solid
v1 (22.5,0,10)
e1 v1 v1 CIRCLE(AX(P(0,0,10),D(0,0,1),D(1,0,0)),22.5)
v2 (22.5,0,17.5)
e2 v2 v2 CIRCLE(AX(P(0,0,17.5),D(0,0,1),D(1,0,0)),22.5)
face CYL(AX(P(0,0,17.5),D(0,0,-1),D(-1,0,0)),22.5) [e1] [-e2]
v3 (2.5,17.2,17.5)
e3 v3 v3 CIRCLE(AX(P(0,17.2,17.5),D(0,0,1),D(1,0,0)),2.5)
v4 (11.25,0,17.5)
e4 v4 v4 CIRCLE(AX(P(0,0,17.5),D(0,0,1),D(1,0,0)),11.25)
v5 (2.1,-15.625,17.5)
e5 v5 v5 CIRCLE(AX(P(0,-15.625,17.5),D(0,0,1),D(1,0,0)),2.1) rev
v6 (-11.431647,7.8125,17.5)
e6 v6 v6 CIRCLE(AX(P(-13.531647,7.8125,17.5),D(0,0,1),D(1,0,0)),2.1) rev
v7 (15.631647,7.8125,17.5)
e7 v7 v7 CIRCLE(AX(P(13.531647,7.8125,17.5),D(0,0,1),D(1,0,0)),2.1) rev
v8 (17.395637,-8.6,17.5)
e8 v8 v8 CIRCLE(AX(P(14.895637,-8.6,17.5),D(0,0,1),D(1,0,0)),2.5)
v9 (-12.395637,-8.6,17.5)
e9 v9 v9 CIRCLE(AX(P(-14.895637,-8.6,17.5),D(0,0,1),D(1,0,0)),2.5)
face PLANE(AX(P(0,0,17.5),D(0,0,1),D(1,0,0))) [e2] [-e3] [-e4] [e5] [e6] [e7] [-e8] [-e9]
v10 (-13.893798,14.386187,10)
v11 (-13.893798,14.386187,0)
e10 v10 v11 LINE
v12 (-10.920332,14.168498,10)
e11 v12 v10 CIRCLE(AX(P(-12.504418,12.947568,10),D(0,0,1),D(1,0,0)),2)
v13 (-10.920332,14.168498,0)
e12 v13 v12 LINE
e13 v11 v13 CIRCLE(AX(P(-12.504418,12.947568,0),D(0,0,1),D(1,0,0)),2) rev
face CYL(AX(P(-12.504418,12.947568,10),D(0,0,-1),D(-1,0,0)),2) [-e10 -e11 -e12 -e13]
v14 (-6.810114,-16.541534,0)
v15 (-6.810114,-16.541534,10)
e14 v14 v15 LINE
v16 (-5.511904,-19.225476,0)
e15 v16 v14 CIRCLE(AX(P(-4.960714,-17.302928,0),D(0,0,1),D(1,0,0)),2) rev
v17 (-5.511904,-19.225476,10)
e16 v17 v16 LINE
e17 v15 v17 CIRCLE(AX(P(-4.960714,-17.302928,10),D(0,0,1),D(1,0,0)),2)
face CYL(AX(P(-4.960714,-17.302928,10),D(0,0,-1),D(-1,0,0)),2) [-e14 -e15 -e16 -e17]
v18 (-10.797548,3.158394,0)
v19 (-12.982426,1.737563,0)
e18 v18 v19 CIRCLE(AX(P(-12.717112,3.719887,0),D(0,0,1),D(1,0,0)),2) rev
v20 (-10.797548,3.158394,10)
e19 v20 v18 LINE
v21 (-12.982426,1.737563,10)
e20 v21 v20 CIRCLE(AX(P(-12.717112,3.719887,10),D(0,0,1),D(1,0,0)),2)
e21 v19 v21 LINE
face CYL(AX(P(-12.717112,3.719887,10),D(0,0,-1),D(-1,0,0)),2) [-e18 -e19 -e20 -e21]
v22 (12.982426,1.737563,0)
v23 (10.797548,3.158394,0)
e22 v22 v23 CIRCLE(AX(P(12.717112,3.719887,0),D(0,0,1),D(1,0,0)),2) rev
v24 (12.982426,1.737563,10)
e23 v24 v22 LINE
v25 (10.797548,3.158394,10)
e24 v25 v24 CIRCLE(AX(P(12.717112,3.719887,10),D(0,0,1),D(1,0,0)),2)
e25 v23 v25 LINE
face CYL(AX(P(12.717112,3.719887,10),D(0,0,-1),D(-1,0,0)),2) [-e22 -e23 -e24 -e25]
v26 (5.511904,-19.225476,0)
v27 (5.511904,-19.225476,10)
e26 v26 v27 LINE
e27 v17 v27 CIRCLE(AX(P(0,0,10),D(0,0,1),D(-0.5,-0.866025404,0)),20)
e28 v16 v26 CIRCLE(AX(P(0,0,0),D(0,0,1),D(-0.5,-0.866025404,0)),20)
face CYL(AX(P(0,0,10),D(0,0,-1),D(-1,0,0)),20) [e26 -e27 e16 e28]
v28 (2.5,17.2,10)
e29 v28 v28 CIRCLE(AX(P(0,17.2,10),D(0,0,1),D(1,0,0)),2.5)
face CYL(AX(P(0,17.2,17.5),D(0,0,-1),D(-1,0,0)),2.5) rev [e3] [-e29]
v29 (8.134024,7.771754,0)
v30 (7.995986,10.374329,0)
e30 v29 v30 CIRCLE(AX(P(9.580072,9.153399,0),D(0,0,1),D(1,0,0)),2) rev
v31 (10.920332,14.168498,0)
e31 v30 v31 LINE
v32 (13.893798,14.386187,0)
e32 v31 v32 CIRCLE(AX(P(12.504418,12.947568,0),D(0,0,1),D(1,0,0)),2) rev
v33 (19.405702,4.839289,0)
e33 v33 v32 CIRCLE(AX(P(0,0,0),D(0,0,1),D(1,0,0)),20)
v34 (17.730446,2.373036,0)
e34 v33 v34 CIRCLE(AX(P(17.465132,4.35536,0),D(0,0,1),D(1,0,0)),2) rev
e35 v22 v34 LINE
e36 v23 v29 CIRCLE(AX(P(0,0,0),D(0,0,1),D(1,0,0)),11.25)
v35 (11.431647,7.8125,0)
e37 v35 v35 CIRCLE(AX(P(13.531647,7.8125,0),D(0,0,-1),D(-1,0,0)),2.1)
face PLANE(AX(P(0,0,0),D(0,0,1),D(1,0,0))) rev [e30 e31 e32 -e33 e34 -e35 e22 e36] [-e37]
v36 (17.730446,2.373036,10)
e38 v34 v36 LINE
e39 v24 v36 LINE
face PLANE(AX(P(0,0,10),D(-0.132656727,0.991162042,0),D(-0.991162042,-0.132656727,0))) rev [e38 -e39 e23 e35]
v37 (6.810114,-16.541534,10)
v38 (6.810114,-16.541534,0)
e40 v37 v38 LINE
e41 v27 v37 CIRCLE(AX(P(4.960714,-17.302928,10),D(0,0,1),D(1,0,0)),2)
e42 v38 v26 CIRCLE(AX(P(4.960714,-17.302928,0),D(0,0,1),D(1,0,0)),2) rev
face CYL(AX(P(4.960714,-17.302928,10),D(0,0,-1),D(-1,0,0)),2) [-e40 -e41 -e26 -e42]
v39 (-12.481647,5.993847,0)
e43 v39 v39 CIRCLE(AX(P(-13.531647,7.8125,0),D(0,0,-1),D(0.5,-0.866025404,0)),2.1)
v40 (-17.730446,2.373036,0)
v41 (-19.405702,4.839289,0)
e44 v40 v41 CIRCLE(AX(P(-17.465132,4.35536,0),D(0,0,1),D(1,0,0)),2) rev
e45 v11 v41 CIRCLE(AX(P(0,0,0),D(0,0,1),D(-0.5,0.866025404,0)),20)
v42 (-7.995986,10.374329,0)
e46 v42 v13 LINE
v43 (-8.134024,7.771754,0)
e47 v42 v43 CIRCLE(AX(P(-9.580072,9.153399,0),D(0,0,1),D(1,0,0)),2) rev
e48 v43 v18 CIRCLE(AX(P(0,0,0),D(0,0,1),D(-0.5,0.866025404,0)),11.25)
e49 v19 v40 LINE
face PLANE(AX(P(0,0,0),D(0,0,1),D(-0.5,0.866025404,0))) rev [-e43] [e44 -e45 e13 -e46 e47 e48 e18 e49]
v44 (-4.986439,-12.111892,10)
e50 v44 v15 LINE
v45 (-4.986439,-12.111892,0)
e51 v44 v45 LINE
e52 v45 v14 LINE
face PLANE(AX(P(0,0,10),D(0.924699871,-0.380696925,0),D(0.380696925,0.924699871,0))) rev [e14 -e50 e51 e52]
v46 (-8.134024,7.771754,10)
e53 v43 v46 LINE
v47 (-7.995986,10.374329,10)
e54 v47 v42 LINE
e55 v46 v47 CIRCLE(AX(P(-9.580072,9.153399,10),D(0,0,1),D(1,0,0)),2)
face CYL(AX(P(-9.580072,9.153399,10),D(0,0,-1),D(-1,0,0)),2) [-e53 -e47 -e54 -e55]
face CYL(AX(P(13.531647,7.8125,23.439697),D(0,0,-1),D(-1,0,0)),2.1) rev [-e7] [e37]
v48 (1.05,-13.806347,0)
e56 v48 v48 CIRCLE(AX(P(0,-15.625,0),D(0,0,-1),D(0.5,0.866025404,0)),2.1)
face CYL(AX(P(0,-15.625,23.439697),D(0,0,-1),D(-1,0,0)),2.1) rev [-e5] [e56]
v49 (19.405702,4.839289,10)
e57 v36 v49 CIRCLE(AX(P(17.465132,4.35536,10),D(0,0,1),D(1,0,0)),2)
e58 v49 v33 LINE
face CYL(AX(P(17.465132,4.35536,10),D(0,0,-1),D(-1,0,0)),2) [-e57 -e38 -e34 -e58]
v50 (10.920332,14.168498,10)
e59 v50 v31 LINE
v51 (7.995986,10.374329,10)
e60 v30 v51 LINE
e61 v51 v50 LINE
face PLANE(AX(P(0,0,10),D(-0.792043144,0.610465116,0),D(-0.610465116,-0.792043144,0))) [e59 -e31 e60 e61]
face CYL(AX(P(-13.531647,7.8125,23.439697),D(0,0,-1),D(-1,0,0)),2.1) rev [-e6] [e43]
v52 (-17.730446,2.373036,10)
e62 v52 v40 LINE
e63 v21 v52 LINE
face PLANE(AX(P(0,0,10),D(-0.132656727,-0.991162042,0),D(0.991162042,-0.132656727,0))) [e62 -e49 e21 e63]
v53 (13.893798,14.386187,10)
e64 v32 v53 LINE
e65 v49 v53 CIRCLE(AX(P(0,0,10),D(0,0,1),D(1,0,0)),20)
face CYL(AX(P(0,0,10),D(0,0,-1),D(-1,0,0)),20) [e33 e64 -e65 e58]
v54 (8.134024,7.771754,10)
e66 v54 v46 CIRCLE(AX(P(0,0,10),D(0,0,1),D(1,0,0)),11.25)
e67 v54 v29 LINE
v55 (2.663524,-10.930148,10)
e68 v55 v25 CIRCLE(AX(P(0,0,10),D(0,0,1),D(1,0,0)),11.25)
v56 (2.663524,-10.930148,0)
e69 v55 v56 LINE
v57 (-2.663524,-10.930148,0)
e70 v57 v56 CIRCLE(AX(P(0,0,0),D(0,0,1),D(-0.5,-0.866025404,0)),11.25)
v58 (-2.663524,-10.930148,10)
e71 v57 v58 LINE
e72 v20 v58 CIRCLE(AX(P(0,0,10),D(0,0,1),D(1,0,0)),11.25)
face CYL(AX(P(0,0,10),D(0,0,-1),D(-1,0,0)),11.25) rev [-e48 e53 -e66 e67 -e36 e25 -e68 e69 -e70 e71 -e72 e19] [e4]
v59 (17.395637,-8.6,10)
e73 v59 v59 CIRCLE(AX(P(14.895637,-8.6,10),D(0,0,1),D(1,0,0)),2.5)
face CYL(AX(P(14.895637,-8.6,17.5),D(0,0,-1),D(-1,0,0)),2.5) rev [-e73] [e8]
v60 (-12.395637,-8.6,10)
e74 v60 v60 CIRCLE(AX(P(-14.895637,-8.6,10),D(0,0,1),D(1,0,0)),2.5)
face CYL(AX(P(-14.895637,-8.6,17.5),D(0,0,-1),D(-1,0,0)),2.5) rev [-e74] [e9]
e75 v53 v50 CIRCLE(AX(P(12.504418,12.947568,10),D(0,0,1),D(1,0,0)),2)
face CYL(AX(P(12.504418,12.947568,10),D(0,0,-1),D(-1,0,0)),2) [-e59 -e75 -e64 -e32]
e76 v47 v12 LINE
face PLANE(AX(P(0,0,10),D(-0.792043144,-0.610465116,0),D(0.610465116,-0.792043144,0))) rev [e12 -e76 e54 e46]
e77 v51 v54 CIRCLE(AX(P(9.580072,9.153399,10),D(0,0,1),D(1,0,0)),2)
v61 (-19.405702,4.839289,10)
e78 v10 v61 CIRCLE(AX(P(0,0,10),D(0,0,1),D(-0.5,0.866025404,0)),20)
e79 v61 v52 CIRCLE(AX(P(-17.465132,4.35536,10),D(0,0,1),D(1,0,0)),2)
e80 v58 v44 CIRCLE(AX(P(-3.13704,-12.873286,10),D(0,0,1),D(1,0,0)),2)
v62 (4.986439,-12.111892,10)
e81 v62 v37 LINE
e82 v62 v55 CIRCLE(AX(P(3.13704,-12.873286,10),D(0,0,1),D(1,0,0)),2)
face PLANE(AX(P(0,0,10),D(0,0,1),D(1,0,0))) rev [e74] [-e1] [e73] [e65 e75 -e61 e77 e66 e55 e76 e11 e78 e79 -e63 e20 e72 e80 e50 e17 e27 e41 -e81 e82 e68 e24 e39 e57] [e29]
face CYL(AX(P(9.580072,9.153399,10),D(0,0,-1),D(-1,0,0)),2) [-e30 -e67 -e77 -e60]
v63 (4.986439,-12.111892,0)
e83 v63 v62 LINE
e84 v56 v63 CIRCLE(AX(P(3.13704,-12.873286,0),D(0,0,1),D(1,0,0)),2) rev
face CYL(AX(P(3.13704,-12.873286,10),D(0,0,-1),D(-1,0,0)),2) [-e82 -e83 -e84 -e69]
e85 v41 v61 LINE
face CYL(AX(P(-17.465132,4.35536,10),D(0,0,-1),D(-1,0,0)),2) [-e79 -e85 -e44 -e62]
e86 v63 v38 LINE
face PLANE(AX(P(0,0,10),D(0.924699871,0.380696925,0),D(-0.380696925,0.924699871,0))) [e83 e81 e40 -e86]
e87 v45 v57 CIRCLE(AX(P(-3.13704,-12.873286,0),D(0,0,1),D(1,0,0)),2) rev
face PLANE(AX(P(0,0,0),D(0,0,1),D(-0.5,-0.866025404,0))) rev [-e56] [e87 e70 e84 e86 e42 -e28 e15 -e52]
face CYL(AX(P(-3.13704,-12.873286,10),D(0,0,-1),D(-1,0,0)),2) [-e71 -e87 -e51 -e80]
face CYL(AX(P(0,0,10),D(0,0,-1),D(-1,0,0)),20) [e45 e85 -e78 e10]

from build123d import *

# Parameters (mm, degrees)
BOSS_EXTRUDE1_DEPTH     = 10
FILLET1_R               = 2
BOSS_EXTRUDE2_START     = 10
SKETCH1_3_R             = 22.5
SKETCH1_3_R_2           = 20
SKETCH1_3_R_3           = 2.5
BOSS_EXTRUDE2_DEPTH     = 7.5
SKETCH2_R               = 2.1
CUT_EXTRUDE2_DEPTH      = 17.5
CIRPATTERN1_START       = 10
CIRPATTERN1_OUTLINE_R   = 2.1
CIRPATTERN1_DEPTH       = 7.5
CIRPATTERN1_2_OUTLINE_R = 2.1
CIRPATTERN1_2_DEPTH     = 10


# Read off the part's stored shape, not the designer's step: CirPattern1
with BuildPart() as part:
    # Sketch1 → Boss-Extrude1 (new body)
    with BuildSketch(Plane.XY):
        with BuildLine():
            ThreePointArc((6.867732558, 8.910485369), (9.742785793, 5.625), (11.150572969, 1.492388177))
            Line((11.150572969, 1.492388177), (19.823240833, 2.653134537))
            ThreePointArc((19.823240833, 2.653134537), (17.320508076, 10), (12.209302326, 15.840862878))
            Line((12.209302326, 15.840862878), (6.867732558, 8.910485369))
        make_face()
    extrude(amount=BOSS_EXTRUDE1_DEPTH)

    # Fillet1
    fillet1_edges = [part.edges().sort_by_distance(p)[0] for p in [
        (11.150572969, 1.492388177, 5),
        (6.867732558, 8.910485369, 5),
        (12.209302326, 15.840862878, 5),
        (19.823240833, 2.653134537, 5),
    ]]
    fillet(fillet1_edges, radius=FILLET1_R)

    # Sketch1<3> → Boss-Extrude2 (add)
    # profile 1 of 3: a face of its own
    with BuildSketch(Plane.XY.offset(BOSS_EXTRUDE2_START)):
        Circle(SKETCH1_3_R)
        Circle(SKETCH1_3_R_2, mode=Mode.SUBTRACT)
    # profile 2 of 3: a face of its own
    with BuildSketch(Plane.XY.offset(BOSS_EXTRUDE2_START)):
        with BuildLine():
            Line((19.823240833, 2.653134537), (11.150572969, 1.492388177))
            ThreePointArc((11.150572969, 1.492388177), (11.225115721, 0.747848281), (11.25, 0))
            ThreePointArc((11.25, 0), (-10.095159515, -4.964902251), (6.867732558, 8.910485369))
            Line((6.867732558, 8.910485369), (12.209302326, 15.840862878))
            ThreePointArc((12.209302326, 15.840862878), (-17.946950249, -8.82649289), (20, 0))
            ThreePointArc((20, 0), (19.955761282, 1.329508055), (19.823240833, 2.653134537))
        make_face()
        with Locations((-14.895636945, -8.6)):
            Circle(SKETCH1_3_R_3, mode=Mode.SUBTRACT)
        with Locations((14.895636945, -8.6)):
            Circle(SKETCH1_3_R_3, mode=Mode.SUBTRACT)
        with Locations((0, 17.2)):
            Circle(SKETCH1_3_R_3, mode=Mode.SUBTRACT)
    # profile 3 of 3: a face of its own
    with BuildSketch(Plane.XY.offset(BOSS_EXTRUDE2_START)):
        with BuildLine():
            ThreePointArc((6.867732558, 8.910485369), (9.742785793, 5.625), (11.150572969, 1.492388177))
            Line((11.150572969, 1.492388177), (19.823240833, 2.653134537))
            ThreePointArc((19.823240833, 2.653134537), (17.320508076, 10), (12.209302326, 15.840862878))
            Line((12.209302326, 15.840862878), (6.867732558, 8.910485369))
        make_face()
    extrude(amount=BOSS_EXTRUDE2_DEPTH)

    # Sketch2 → Cut-Extrude2 (cut)
    with BuildSketch(Plane(origin=(0, 0, 0), x_dir=(-1, 0, 0), z_dir=(0, 0, -1))):
        with Locations((-13.531646934, 7.8125)):
            Circle(SKETCH2_R)
    extrude(amount=-CUT_EXTRUDE2_DEPTH, mode=Mode.SUBTRACT)

    # CirPattern1 outline → CirPattern1 (cut)
    with BuildSketch(Plane.XY.offset(CIRPATTERN1_START)):
        with Locations((0, -15.625)):
            Circle(CIRPATTERN1_OUTLINE_R)
        with Locations((-13.531646934, 7.8125)):
            Circle(CIRPATTERN1_OUTLINE_R)
    extrude(amount=CIRPATTERN1_DEPTH, mode=Mode.SUBTRACT)

    # CirPattern1 2 outline → CirPattern1 2 (add)
    # profile 1 of 2: a face of its own
    with BuildSketch(Plane.XY):
        with BuildLine():
            ThreePointArc((-13.893798079, 14.386186949), (-17.320508076, 10), (-19.405702401, 4.839288617))
            ThreePointArc((-19.405702401, 4.839288617), (-19.119544932, 3.231563339), (-17.730445615, 2.373035672))
            Line((-17.730445615, 2.373035672), (-12.982425667, 1.737562602))
            ThreePointArc((-12.982425667, 1.737562602), (-11.626778767, 2.043231391), (-10.797548106, 3.158394355))
            ThreePointArc((-10.797548106, 3.158394355), (-9.742785793, 5.625), (-8.1340238, 7.771753781))
            ThreePointArc((-8.1340238, 7.771753781), (-7.582879674, 9.047470081), (-7.995986187, 10.37432913))
            Line((-7.995986187, 10.37432913), (-10.920331983, 14.168498487))
            ThreePointArc((-10.920331983, 14.168498487), (-12.358388411, 14.94222995), (-13.893798079, 14.386186949))
        make_face()
        with Locations((-13.531646934, 7.8125)):
            Circle(CIRPATTERN1_2_OUTLINE_R, mode=Mode.SUBTRACT)
    # profile 2 of 2: a face of its own
    with BuildSketch(Plane.XY):
        with BuildLine():
            ThreePointArc((2.663524306, -10.930148136), (0, -11.25), (-2.663524306, -10.930148136))
            ThreePointArc((-2.663524306, -10.930148136), (-4.043899093, -11.090701472), (-4.98643948, -12.111891731))
            Line((-4.98643948, -12.111891731), (-6.810113632, -16.541534159))
            ThreePointArc((-6.810113632, -16.541534159), (-6.761156521, -18.173793289), (-5.511904322, -19.225475566))
            ThreePointArc((-5.511904322, -19.225475566), (0, -20), (5.511904322, -19.225475566))
            ThreePointArc((5.511904322, -19.225475566), (6.761156521, -18.173793289), (6.810113632, -16.541534159))
            Line((6.810113632, -16.541534159), (4.98643948, -12.111891731))
            ThreePointArc((4.98643948, -12.111891731), (4.043899093, -11.090701472), (2.663524306, -10.930148136))
        make_face()
        with Locations((0, -15.625)):
            Circle(CIRPATTERN1_2_OUTLINE_R, mode=Mode.SUBTRACT)
    extrude(amount=CIRPATTERN1_2_DEPTH)


solid = part.part
